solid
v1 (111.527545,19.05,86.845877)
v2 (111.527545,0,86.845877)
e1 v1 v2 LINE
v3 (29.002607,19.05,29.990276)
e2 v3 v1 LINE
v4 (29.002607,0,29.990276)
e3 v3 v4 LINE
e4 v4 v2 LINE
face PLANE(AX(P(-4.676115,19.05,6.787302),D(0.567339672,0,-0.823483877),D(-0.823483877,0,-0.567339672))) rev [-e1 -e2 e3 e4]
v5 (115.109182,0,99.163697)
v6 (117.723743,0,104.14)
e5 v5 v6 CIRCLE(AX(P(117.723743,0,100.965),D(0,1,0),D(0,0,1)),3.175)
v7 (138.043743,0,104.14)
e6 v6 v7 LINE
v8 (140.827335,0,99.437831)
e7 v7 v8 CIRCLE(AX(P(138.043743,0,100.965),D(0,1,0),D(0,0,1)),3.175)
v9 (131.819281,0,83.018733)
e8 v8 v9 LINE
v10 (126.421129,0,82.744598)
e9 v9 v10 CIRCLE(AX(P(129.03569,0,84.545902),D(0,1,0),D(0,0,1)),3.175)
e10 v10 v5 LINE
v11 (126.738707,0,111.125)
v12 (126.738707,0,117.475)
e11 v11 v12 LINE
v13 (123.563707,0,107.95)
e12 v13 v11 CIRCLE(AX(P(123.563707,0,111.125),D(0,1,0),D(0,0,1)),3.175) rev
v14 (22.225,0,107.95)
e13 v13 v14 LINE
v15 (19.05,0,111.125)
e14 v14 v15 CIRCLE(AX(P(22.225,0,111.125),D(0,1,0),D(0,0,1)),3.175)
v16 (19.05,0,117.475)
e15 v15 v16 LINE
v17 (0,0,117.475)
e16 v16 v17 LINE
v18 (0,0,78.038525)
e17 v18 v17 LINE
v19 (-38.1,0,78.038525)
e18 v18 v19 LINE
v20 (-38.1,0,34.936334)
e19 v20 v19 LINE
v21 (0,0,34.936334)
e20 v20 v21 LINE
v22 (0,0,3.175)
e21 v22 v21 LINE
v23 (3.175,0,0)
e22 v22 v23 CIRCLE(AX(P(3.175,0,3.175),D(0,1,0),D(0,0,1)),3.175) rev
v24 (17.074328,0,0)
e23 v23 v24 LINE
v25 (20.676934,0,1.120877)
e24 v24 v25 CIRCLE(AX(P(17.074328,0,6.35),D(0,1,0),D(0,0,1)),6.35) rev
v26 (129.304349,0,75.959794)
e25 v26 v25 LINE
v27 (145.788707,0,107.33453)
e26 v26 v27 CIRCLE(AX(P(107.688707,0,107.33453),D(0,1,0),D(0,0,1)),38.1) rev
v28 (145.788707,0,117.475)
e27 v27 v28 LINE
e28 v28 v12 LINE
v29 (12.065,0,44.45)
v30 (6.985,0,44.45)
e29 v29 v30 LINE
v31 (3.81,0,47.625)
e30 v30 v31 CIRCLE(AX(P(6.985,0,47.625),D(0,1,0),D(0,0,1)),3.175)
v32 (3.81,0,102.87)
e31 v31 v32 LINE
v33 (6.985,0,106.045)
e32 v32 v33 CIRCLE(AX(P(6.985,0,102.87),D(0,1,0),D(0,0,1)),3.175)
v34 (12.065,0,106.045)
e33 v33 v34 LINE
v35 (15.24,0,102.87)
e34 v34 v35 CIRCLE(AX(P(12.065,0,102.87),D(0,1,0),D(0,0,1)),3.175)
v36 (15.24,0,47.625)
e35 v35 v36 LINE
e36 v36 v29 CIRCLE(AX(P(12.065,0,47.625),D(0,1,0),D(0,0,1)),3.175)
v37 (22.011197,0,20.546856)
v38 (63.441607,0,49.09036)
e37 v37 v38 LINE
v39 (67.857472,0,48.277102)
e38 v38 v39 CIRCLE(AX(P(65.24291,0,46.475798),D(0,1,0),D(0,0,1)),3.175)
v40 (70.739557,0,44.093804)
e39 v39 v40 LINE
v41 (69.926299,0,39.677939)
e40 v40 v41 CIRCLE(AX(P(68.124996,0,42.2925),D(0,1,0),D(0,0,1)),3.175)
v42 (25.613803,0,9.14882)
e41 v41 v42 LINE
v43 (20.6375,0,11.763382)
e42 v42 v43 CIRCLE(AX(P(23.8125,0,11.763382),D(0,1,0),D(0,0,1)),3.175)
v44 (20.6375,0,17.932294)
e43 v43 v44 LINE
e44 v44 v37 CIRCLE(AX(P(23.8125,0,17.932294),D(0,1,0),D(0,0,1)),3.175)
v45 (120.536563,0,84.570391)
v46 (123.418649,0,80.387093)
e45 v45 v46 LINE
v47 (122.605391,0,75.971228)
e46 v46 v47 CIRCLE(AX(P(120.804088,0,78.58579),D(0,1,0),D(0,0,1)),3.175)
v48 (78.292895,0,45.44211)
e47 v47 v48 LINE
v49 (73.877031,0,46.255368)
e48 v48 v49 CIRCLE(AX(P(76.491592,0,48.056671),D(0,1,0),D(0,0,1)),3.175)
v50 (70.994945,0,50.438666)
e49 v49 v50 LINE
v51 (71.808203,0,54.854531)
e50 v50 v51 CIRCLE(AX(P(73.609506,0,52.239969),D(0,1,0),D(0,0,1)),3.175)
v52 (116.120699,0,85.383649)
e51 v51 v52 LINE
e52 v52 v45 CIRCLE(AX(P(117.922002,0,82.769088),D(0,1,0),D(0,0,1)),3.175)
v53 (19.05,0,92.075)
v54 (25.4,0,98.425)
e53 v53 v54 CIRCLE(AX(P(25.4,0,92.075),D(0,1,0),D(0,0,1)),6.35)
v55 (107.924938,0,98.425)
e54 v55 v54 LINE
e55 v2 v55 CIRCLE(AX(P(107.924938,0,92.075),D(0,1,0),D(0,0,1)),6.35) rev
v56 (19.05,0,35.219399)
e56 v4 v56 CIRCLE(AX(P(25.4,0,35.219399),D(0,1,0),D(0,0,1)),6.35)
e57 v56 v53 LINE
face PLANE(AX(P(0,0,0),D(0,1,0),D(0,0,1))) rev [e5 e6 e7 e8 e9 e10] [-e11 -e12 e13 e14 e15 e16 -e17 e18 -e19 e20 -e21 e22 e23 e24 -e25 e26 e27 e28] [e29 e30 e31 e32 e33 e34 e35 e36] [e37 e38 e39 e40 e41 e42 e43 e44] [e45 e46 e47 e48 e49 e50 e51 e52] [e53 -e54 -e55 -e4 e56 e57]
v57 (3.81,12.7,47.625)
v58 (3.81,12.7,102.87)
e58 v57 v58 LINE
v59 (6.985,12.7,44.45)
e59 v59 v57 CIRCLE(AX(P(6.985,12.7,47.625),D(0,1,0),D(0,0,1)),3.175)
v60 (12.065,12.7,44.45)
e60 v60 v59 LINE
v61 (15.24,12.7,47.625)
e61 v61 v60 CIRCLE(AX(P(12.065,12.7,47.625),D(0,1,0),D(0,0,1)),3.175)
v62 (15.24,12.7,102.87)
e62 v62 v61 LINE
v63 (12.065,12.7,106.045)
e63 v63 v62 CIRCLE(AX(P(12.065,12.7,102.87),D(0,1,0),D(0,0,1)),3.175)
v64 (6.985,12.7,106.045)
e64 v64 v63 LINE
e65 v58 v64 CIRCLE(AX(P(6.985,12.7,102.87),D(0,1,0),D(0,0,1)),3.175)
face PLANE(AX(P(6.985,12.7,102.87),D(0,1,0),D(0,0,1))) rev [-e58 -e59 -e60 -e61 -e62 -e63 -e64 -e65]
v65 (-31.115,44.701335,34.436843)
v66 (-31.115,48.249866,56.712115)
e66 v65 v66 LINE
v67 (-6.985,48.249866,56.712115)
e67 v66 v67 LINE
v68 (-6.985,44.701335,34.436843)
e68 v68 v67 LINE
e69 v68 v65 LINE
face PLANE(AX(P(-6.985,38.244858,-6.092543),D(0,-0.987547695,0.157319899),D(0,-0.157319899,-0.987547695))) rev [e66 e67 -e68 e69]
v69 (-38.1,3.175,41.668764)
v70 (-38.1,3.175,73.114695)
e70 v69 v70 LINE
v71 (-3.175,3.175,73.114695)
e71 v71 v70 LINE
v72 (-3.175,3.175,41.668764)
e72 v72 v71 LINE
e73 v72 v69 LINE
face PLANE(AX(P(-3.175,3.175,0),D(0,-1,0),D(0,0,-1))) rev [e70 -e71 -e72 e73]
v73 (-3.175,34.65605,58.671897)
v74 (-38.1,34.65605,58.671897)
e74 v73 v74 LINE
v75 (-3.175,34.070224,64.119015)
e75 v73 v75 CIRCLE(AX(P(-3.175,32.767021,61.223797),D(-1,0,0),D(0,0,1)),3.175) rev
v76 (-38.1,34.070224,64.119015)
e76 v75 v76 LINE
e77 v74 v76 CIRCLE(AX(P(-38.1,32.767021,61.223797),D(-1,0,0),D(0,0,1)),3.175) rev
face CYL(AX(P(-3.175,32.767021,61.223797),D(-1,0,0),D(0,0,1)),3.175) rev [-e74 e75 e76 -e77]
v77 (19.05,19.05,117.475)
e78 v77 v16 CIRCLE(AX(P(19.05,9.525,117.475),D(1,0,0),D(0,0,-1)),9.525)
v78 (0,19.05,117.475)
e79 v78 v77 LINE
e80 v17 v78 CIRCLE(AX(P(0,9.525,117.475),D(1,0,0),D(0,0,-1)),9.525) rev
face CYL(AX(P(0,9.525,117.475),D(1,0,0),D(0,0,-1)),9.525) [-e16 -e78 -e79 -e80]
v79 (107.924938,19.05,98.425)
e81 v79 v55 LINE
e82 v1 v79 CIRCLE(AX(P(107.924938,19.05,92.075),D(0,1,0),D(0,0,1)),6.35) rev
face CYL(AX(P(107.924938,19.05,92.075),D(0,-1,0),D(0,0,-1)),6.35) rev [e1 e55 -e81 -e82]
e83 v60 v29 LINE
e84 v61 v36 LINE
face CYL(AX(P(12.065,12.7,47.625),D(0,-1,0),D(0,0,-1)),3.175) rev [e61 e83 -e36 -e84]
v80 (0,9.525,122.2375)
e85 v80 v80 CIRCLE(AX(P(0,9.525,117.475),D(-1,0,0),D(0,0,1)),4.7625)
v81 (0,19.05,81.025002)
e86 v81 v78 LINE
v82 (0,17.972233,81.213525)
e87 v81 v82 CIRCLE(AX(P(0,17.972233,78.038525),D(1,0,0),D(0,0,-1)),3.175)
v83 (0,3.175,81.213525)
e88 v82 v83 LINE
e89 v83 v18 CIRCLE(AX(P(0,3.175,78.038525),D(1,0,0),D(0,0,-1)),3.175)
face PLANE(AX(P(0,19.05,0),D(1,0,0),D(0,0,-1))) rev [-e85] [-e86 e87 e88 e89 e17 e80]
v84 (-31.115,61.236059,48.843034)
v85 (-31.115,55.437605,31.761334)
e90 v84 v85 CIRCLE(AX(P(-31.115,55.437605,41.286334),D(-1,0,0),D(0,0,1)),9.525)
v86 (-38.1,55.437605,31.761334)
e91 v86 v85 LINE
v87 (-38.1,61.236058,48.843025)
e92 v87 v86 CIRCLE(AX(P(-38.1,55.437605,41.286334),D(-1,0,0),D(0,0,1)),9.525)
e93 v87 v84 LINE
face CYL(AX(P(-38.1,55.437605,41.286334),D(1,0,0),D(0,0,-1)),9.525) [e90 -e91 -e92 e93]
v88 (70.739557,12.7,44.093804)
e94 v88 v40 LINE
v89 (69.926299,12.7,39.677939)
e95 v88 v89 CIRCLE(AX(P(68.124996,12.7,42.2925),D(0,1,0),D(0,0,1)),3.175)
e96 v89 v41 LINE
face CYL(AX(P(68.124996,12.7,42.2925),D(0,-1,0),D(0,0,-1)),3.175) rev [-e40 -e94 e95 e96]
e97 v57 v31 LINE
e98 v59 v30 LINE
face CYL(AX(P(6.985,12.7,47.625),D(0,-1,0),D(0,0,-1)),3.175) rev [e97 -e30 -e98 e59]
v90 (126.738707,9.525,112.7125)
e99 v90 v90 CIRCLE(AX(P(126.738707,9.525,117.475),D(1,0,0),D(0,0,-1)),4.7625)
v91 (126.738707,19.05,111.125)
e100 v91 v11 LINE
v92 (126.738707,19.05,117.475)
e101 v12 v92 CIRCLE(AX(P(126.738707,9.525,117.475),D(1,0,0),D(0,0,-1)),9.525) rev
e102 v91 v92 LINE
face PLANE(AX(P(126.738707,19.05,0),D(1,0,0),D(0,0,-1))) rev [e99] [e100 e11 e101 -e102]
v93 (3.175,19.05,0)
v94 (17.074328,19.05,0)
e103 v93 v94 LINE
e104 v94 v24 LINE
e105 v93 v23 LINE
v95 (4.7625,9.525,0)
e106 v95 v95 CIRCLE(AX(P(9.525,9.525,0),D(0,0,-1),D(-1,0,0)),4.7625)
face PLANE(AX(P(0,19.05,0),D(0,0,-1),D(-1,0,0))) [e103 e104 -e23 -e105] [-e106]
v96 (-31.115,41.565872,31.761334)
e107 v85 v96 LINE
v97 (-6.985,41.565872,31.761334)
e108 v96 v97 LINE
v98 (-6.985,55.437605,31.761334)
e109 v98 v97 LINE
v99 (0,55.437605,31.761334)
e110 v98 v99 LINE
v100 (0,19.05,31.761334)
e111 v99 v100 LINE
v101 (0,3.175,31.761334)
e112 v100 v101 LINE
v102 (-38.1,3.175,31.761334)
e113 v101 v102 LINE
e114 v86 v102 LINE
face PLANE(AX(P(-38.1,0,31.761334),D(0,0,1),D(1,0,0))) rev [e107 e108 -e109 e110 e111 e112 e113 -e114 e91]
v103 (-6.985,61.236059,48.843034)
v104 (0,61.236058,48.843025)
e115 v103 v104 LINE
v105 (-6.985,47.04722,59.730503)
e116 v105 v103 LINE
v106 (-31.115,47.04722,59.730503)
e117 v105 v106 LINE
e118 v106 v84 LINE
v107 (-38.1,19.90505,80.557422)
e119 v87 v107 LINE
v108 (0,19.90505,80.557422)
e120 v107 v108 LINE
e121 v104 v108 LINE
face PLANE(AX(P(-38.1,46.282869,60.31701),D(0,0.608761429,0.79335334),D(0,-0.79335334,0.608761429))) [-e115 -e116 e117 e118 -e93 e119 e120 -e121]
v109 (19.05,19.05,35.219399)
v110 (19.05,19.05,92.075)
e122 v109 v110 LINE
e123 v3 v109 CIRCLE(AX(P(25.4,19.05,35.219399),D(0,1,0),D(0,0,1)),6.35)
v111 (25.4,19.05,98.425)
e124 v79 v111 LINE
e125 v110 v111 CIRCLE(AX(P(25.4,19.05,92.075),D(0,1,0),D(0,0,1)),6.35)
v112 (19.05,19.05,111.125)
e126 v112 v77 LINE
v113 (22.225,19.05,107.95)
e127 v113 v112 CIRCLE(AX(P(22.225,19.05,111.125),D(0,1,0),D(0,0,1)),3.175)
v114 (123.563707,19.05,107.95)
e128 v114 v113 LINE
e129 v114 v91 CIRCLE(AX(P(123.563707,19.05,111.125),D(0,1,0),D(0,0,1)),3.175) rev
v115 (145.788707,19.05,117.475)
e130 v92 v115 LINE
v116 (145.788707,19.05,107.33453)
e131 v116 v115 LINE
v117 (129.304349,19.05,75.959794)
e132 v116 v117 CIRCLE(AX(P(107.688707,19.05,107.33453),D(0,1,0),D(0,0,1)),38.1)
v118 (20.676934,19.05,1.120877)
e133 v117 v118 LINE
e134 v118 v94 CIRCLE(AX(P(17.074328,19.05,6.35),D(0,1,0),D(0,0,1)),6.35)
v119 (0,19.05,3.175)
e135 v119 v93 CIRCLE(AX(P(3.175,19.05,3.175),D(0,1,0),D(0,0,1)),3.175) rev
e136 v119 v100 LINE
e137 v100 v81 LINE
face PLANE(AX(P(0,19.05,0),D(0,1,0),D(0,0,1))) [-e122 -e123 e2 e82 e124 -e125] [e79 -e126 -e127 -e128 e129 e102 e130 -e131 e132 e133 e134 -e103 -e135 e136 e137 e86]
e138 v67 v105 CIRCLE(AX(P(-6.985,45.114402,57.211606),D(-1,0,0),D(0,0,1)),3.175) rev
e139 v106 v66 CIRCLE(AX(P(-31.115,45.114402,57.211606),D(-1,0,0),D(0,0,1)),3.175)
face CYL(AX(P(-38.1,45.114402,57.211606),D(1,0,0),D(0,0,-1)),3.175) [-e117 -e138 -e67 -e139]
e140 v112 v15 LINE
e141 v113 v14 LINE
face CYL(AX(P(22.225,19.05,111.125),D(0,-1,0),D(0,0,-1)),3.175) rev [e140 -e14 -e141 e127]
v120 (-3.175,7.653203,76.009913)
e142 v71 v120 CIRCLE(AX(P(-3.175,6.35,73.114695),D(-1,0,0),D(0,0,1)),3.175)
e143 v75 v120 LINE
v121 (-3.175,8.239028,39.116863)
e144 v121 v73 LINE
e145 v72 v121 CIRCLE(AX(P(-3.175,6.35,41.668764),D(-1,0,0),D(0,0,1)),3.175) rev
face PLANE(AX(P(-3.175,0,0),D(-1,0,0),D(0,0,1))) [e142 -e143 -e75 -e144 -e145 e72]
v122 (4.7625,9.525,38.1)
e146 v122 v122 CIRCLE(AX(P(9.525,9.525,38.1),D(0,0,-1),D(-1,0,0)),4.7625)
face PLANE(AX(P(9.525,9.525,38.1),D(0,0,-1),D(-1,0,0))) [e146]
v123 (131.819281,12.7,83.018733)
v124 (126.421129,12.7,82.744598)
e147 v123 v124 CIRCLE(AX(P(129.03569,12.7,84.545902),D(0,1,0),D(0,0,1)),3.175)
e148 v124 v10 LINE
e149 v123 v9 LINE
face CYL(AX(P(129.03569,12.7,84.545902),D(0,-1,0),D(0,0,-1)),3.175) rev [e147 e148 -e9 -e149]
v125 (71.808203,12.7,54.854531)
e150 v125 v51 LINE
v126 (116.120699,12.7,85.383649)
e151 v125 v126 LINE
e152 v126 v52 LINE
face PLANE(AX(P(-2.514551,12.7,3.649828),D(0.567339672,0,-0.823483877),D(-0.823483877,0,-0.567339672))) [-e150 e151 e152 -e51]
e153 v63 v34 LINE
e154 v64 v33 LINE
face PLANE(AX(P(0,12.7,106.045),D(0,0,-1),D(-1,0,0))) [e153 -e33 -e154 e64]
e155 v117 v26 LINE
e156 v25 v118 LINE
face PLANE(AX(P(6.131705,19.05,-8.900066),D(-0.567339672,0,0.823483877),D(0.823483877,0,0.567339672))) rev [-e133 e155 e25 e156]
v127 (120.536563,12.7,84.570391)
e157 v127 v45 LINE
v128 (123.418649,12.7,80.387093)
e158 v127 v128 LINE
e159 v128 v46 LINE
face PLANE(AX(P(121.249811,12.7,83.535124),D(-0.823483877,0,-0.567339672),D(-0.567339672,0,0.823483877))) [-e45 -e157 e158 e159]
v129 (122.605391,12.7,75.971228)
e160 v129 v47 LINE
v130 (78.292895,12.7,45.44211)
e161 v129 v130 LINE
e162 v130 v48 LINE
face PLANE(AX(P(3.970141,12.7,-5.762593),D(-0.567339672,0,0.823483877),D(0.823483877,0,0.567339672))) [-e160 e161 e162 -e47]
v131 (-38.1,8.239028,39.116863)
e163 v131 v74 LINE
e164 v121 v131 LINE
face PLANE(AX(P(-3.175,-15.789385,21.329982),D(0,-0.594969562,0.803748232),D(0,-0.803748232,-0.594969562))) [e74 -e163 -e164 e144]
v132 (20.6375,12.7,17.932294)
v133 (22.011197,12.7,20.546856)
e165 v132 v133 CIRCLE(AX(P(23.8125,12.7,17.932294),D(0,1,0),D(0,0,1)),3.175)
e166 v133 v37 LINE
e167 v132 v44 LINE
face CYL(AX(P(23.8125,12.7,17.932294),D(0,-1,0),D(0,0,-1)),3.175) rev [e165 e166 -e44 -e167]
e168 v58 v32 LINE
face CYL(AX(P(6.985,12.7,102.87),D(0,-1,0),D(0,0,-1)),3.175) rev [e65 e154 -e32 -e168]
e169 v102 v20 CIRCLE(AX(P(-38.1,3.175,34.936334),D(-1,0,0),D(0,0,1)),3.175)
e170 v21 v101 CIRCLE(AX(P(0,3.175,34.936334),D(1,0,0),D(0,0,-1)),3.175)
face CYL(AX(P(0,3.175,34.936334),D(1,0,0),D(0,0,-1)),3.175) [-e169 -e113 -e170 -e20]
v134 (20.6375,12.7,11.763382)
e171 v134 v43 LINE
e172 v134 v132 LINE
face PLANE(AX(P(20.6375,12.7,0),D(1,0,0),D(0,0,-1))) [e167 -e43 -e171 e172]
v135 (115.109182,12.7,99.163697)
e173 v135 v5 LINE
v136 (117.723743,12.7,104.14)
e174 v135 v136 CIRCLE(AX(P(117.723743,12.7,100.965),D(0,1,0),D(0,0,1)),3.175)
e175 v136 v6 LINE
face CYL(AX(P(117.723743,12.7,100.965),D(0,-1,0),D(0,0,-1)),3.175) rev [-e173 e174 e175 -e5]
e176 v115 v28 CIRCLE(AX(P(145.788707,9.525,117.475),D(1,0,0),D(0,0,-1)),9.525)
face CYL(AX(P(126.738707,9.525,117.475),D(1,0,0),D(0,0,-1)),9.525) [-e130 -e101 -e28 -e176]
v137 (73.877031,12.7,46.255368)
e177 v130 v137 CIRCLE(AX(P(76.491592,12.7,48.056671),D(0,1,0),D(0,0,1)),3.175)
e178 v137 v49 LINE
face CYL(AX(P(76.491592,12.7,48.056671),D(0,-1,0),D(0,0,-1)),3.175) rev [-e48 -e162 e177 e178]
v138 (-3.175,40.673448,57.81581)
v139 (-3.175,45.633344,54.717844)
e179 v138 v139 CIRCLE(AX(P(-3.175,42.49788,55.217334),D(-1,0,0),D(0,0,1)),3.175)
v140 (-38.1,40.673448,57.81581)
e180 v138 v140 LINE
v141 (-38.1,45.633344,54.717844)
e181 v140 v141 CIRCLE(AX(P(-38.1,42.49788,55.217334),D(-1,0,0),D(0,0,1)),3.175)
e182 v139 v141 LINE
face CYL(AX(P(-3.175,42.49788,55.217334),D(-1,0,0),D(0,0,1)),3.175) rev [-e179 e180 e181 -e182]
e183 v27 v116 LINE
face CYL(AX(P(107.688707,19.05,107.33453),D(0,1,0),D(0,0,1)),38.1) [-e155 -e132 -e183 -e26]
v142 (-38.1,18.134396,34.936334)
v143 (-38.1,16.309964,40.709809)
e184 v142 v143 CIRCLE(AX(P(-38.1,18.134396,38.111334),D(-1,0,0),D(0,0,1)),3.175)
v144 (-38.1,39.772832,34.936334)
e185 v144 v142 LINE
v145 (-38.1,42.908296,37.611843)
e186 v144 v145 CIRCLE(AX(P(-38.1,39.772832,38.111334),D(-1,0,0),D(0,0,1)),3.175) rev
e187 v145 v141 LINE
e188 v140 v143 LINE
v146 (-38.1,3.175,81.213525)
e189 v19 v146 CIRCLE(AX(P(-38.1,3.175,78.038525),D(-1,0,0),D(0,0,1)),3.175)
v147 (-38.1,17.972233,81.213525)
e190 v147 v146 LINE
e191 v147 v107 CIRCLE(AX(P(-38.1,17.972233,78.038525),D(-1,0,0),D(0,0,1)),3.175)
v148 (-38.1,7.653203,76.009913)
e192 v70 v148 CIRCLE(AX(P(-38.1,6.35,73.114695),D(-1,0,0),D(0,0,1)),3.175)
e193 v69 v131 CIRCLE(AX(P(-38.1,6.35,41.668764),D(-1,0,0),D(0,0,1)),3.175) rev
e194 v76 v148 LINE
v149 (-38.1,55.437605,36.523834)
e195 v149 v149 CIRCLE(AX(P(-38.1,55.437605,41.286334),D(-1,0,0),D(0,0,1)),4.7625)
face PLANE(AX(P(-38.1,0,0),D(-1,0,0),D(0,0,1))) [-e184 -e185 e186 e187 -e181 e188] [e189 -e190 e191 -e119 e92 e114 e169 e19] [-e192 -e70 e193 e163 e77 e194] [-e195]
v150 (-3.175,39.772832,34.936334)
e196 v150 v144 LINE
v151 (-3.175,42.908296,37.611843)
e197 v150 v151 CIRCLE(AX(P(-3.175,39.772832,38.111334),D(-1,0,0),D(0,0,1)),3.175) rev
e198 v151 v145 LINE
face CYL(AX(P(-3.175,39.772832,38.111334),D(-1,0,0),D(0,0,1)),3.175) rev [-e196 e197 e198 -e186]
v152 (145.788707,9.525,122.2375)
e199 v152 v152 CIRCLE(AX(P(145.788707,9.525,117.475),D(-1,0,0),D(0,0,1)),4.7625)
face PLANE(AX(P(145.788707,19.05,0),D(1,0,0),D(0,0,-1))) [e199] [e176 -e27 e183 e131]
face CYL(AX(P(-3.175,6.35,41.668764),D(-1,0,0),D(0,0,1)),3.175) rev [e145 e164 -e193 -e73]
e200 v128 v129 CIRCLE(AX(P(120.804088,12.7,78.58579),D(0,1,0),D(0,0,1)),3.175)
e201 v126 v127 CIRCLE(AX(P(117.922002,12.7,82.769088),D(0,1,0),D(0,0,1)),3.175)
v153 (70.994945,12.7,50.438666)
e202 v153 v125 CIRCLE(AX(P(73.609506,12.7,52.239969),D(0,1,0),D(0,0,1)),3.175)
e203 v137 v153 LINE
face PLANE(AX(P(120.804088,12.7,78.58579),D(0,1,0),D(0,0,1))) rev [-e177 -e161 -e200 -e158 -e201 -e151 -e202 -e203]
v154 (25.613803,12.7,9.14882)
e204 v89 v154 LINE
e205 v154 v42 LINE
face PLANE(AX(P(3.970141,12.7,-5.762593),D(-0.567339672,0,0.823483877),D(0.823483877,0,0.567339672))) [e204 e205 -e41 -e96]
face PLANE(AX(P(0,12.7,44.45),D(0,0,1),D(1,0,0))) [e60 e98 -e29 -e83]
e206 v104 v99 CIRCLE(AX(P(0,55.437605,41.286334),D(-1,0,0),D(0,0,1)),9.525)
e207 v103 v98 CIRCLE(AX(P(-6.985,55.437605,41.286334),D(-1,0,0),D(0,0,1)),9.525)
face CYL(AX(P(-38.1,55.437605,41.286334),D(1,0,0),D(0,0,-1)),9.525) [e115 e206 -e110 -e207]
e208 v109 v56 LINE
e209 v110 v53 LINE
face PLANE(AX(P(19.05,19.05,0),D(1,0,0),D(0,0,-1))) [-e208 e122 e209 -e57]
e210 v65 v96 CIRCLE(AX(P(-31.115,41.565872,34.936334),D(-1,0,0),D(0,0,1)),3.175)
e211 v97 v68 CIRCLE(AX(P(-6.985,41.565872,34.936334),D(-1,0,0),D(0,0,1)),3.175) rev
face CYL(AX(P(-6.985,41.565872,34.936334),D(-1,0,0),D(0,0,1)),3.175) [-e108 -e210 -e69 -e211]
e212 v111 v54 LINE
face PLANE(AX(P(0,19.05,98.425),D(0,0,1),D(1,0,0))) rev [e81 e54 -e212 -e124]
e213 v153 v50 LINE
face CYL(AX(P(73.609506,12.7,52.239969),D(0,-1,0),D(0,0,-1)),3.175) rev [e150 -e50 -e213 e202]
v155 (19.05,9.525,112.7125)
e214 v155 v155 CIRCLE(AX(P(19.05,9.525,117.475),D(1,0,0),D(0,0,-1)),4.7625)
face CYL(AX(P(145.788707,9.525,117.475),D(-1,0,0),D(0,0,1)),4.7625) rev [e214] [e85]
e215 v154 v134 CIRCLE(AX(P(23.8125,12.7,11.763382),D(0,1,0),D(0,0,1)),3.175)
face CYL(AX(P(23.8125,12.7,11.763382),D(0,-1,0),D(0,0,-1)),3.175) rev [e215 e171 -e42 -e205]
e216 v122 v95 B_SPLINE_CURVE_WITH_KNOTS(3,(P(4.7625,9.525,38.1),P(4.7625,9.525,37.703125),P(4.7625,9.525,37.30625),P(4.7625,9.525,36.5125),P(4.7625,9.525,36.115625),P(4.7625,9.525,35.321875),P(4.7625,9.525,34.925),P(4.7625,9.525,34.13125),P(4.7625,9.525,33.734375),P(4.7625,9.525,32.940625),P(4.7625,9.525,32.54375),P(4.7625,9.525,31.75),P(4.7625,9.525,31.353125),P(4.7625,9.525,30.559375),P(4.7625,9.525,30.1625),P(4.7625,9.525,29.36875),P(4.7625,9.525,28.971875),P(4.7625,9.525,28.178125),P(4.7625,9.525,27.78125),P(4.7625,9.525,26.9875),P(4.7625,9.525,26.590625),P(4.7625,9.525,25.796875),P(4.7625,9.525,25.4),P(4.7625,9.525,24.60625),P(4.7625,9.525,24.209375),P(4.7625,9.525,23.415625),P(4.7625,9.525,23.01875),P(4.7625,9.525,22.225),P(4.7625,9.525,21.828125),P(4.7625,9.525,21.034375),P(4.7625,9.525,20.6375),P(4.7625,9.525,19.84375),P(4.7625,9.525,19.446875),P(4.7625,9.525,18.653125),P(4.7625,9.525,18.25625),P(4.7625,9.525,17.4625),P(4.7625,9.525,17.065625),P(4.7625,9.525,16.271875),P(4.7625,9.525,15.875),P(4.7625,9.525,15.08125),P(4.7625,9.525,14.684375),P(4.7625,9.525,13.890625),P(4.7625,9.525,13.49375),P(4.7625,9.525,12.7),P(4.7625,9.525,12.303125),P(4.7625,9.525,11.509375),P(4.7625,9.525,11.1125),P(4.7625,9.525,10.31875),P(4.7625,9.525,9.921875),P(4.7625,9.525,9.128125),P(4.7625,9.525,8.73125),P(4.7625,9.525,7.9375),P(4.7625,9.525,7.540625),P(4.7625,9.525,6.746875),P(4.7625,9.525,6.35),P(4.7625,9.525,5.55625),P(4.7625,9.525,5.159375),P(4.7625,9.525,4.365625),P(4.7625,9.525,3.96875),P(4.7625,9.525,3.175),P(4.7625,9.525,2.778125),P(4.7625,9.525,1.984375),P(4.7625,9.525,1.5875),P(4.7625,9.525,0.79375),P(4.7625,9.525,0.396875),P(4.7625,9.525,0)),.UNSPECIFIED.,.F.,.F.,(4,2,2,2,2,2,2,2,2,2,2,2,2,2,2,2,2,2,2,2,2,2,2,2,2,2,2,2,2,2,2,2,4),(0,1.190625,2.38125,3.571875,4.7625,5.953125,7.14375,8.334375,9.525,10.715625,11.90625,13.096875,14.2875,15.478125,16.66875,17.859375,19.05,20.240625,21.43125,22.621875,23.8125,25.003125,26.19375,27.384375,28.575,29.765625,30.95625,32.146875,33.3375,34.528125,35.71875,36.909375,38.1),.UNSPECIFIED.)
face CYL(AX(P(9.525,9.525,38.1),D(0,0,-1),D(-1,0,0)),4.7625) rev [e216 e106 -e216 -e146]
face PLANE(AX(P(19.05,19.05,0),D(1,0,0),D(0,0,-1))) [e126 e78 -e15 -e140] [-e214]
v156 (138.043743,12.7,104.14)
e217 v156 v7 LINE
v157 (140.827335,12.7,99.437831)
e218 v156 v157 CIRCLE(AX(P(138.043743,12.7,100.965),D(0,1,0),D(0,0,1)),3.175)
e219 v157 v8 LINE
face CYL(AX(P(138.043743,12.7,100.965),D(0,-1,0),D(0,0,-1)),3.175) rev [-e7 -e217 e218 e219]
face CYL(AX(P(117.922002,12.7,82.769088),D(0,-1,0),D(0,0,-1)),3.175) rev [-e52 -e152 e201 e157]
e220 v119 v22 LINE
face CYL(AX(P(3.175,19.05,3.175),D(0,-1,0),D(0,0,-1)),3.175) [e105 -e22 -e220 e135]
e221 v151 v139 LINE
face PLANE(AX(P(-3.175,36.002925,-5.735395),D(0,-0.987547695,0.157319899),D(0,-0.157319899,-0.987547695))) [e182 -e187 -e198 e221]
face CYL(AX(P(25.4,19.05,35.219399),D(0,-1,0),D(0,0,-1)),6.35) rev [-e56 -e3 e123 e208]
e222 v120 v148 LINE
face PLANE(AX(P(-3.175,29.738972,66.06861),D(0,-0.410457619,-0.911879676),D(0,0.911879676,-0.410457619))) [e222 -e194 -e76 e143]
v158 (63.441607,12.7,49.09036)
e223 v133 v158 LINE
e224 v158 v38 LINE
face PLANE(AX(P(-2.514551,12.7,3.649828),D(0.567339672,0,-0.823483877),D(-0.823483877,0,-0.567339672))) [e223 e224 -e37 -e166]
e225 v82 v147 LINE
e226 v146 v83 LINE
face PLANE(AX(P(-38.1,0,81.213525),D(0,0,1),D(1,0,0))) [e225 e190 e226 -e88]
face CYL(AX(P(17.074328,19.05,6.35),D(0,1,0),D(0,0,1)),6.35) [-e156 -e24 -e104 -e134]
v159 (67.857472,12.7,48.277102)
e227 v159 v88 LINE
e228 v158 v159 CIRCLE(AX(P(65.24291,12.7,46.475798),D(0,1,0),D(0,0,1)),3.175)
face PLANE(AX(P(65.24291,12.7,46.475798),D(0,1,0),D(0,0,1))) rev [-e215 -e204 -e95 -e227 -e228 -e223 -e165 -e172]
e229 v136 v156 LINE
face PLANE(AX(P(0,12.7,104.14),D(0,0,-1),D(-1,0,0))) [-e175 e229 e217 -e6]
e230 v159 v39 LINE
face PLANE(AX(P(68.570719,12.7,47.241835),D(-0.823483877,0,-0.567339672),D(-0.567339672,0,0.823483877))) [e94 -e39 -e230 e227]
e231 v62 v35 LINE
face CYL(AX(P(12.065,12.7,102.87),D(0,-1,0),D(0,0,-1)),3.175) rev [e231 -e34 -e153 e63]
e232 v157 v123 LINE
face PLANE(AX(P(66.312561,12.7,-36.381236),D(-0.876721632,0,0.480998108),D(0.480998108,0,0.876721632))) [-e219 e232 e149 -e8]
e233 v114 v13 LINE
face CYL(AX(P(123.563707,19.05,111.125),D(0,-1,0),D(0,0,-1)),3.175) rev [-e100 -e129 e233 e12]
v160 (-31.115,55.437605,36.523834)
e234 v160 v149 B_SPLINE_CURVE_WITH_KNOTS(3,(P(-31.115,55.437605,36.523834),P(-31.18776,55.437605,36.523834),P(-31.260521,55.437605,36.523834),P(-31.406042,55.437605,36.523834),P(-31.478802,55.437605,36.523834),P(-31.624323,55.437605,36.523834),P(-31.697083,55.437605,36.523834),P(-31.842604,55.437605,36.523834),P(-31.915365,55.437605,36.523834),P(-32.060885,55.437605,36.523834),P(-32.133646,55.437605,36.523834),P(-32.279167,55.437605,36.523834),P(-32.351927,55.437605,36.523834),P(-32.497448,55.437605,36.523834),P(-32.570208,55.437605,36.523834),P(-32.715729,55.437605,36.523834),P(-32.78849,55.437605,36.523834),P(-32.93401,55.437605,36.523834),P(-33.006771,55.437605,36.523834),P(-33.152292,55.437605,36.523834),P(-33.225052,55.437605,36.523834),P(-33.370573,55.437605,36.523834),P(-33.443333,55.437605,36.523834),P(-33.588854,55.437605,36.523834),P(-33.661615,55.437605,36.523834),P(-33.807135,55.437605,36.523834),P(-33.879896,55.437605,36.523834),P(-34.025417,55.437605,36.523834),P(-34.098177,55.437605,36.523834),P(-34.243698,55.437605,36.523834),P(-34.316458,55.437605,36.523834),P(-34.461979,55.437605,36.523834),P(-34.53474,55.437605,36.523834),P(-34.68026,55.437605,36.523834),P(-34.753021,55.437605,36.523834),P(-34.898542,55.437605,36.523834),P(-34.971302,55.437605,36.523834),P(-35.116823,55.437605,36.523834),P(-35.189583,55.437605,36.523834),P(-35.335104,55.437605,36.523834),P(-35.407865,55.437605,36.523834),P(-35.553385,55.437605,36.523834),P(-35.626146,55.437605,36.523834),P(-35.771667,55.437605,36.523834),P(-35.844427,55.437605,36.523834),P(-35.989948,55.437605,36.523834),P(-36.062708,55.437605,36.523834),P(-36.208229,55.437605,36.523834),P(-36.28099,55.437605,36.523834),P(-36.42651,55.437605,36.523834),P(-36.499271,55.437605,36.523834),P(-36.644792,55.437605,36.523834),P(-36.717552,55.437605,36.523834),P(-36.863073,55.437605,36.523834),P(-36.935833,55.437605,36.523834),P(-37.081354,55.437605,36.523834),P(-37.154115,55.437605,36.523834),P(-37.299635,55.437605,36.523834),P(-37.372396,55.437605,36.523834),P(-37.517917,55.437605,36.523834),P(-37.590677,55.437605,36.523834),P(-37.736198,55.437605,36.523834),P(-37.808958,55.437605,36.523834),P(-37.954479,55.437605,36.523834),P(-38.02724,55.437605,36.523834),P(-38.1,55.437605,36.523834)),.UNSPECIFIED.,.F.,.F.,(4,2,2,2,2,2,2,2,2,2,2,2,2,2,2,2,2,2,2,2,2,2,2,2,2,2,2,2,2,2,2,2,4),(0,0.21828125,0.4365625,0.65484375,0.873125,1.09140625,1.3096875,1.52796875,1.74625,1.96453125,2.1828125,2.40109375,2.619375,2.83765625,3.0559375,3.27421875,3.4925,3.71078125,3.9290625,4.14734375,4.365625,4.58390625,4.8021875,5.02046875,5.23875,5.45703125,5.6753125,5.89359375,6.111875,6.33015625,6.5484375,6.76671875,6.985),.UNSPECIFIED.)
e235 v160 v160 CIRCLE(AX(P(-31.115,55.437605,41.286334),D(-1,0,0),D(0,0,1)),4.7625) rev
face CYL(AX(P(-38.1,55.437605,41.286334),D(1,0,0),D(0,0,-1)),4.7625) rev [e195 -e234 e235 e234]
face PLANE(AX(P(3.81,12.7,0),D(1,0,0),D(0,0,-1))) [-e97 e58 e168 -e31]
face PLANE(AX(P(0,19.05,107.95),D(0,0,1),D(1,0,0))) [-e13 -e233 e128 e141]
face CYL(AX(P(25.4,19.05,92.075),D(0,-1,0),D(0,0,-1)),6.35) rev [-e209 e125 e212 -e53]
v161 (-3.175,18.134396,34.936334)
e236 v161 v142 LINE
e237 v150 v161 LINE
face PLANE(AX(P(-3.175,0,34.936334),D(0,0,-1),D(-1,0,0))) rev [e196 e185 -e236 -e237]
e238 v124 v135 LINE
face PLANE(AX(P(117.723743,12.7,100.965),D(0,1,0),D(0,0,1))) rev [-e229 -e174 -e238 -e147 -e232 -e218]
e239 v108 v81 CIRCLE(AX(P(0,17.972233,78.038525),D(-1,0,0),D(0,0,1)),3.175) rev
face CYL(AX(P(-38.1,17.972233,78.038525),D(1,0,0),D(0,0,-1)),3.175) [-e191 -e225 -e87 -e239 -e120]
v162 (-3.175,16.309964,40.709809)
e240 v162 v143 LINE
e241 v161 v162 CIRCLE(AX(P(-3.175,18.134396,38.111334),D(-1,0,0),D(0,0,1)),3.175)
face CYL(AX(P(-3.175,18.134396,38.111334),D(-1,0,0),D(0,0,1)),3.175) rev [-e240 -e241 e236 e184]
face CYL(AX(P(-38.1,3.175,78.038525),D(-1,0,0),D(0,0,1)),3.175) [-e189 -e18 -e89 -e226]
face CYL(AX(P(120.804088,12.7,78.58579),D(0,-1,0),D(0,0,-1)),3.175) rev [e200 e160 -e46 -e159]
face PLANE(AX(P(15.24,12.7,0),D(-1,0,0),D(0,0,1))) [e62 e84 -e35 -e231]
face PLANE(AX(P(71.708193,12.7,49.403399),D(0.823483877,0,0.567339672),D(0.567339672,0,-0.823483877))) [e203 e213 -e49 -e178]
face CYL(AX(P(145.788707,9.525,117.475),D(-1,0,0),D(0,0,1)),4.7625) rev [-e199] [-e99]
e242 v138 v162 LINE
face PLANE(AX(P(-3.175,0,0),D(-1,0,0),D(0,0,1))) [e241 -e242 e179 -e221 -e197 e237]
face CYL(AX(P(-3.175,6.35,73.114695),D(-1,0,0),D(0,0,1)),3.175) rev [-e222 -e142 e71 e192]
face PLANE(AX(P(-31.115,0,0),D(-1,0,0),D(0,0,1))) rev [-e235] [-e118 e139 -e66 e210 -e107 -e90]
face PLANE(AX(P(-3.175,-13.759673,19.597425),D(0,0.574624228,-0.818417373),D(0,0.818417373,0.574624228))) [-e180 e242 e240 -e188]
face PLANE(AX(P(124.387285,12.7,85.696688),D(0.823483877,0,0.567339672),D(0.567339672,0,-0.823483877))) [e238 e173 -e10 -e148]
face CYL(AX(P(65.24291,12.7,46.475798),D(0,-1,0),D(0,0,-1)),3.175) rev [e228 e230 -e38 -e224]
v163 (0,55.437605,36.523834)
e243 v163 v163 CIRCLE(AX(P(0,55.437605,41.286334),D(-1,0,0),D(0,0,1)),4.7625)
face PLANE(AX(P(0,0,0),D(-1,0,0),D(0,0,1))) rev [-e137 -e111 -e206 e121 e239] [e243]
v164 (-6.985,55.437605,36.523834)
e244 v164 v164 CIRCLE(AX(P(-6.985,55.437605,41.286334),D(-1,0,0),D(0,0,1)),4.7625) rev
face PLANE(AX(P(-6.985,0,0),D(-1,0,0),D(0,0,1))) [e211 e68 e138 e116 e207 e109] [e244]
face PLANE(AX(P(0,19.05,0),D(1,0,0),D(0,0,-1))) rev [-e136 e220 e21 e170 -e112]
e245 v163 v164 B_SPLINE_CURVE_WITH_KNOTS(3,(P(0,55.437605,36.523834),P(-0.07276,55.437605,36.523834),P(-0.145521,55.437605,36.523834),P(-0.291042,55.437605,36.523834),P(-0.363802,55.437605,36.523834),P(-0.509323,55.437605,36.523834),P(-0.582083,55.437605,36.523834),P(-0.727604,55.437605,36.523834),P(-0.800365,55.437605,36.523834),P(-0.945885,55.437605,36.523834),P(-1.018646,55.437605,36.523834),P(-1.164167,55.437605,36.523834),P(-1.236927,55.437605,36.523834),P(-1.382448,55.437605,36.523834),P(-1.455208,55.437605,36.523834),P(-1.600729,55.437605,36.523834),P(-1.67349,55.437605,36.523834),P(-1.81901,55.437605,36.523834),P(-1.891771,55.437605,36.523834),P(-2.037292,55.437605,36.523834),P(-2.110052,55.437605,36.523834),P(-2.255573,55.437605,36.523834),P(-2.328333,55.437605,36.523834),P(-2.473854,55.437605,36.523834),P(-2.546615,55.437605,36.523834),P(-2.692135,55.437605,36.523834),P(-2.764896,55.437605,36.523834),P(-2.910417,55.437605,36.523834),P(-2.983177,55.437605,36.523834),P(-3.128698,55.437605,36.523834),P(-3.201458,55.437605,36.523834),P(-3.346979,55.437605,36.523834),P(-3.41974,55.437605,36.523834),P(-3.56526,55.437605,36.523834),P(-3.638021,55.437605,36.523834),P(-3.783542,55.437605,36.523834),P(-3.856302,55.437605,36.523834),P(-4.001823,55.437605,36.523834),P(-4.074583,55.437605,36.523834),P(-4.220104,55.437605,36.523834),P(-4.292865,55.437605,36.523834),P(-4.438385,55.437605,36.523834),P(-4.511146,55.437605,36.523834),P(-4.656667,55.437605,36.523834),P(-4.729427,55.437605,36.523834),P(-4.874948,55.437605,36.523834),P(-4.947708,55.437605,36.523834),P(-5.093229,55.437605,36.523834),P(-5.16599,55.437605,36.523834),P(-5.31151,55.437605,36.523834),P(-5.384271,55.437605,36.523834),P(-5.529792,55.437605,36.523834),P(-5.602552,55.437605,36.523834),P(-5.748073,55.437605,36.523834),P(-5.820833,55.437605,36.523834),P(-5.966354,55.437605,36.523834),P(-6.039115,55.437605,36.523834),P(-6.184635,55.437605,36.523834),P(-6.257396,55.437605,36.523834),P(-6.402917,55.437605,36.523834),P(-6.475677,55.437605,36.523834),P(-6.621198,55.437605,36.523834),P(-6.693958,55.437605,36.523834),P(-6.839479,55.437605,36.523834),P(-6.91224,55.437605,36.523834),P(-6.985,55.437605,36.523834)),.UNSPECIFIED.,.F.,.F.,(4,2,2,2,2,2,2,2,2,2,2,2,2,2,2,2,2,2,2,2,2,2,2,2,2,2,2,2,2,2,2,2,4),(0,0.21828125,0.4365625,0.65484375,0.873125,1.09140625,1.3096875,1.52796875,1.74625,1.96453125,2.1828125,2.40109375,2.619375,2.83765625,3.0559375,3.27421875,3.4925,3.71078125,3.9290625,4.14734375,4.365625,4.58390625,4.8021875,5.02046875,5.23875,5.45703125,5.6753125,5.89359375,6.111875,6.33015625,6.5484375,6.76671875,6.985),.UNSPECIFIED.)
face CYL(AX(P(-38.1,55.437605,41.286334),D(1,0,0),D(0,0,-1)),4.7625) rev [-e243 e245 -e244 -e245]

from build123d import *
from build123d.topology import SkipClean

# Parameters (mm, degrees)
BOSS_EXTRUDE1_DEPTH = 19.05
SKETCH7_R           = 4.7625
CUT_EXTRUDE7_DEPTH  = 38.1
FILLET4_R           = 38.1
FILLET5_R           = 6.35
SKETCH8_R           = 4.7625
CUT_EXTRUDE8_DEPTH  = 195.283940649
FILLET6_RADIUS      = 9.525
FILLET6_LENGTH      = 19.05
FILLET7_RADIUS      = 9.525
FILLET7_LENGTH      = 19.05
CUT_EXTRUDE9_START  = -19.05
CUT_EXTRUDE9_DEPTH  = 12.7
CUT_EXTRUDE10_START = -19.05
CUT_EXTRUDE10_DEPTH = 12.7
CUT_EXTRUDE11_START = -19.05
CUT_EXTRUDE11_DEPTH = 12.7
SKETCH12_R          = 4.7625
BOSS_EXTRUDE2_DEPTH = 38.1
CUT_EXTRUDE12_DEPTH = 34.925
CUT_EXTRUDE13_START = -6.985
SKETCH13_4_R        = 4.7625
CUT_EXTRUDE13_DEPTH = 24.13
FILLET13_R          = 3.175
FILLET14_R          = 3.175
FILLET15_R          = 3.175


with BuildPart() as part:
    # Sketch1 → Boss-Extrude1 (new body)
    with BuildSketch(Plane(origin=(0, 0, 0), x_dir=(1, 0, 0), z_dir=(0, 1, 0))):
        with BuildLine():
            ThreePointArc((3.175, 0), (0.92993597, -0.92993597), (0, -3.175))
            Line((0, -3.175), (0, -127))
            Line((0, -127), (19.05, -127))
            Line((19.05, -127), (19.05, -111.125))
            ThreePointArc((19.05, -111.125), (19.97993597, -108.87993597), (22.225, -107.95))
            Line((22.225, -107.95), (123.563707018, -107.95))
            ThreePointArc((123.563707018, -107.95), (125.808771048, -108.87993597), (126.738707018, -111.125))
            Line((126.738707018, -111.125), (126.738707018, -127))
            Line((126.738707018, -127), (145.788707018, -127))
            Line((145.788707018, -127), (145.788707018, -87.316702208))
            Line((145.788707018, -87.316702208), (19.05, 0))
            Line((19.05, 0), (3.175, 0))
        make_face()
        with BuildLine():
            Line((29.002606919, -29.990275978), (111.5275446, -86.845877379))
            ThreePointArc((111.5275446, -86.845877379), (113.98824654, -93.961474404), (107.924937681, -98.425))
            Line((107.924937681, -98.425), (25.4, -98.425))
            ThreePointArc((25.4, -98.425), (20.909871939, -96.565128061), (19.05, -92.075))
            Line((19.05, -92.075), (19.05, -35.2193986))
            ThreePointArc((19.05, -35.2193986), (22.446532033, -29.598052945), (29.002606919, -29.990275978))
        make_face(mode=Mode.SUBTRACT)
    extrude(amount=BOSS_EXTRUDE1_DEPTH)

    # Sketch7 → Cut-Extrude7 (cut)
    with BuildSketch(Plane(origin=(0, 0, 0), x_dir=(-1, 0, 0), z_dir=(0, 0, -1))):
        with Locations((-9.525, 9.525)):
            Circle(SKETCH7_R)
    extrude(amount=-CUT_EXTRUDE7_DEPTH, mode=Mode.SUBTRACT)

    # Fillet4
    fillet4_edges = [part.edges().sort_by_distance(p)[0] for p in [
        (145.788707018, 9.525, 87.316702208),
    ]]
    fillet(fillet4_edges, radius=FILLET4_R)

    # Fillet5
    fillet5_edges = [part.edges().sort_by_distance(p)[0] for p in [
        (19.05, 9.525, 0),
    ]]
    fillet(fillet5_edges, radius=FILLET5_R)

    # Sketch8 → Cut-Extrude8 (cut, through all)
    with BuildSketch(Plane.ZY):
        with Locations((117.475, 9.525)):
            Circle(SKETCH8_R)
    extrude(amount=-CUT_EXTRUDE8_DEPTH, mode=Mode.SUBTRACT)

    # Fillet6: full round fillet: the end face becomes a half cylinder, R = half its width
    fillet6_face = Plane((9.525, 9.525, 127), x_dir=(1, 0, 0), z_dir=(0, 0, 1))  # on the end face: x along it, z out of the body
    fillet6_slab = fillet6_face.offset(-FILLET6_RADIUS / 2) * Box(FILLET6_LENGTH, 2 * FILLET6_RADIUS, FILLET6_RADIUS, mode=Mode.PRIVATE)  # the body's end, R deep
    fillet6_round = Plane((9.525, 9.525, 117.475), x_dir=(0, 0, 1), z_dir=(1, 0, 0)) * Cylinder(FILLET6_RADIUS, FILLET6_LENGTH, mode=Mode.PRIVATE)  # its axis R under the face
    add(fillet6_slab - fillet6_round, mode=Mode.SUBTRACT)

    # Fillet7: full round fillet: the end face becomes a half cylinder, R = half its width
    fillet7_face = Plane((136.263707018, 9.525, 127), x_dir=(-1, 0, 0), z_dir=(0, 0, 1))  # on the end face: x along it, z out of the body
    fillet7_slab = fillet7_face.offset(-FILLET7_RADIUS / 2) * Box(FILLET7_LENGTH, 2 * FILLET7_RADIUS, FILLET7_RADIUS, mode=Mode.PRIVATE)  # the body's end, R deep
    fillet7_round = Plane((136.263707018, 9.525, 117.475), x_dir=(0, 0, 1), z_dir=(-1, 0, 0)) * Cylinder(FILLET7_RADIUS, FILLET7_LENGTH, mode=Mode.PRIVATE)  # its axis R under the face
    add(fillet7_slab - fillet7_round, mode=Mode.SUBTRACT)

    # Sketch9 → Cut-Extrude9 (cut)
    with BuildSketch(Plane(origin=(0, 19.05, 0), x_dir=(1, 0, 0), z_dir=(0, 1, 0)).offset(CUT_EXTRUDE9_START)):
        with BuildLine():
            Line((6.985, -44.45), (12.065, -44.45))
            ThreePointArc((12.065, -44.45), (14.31006403, -45.37993597), (15.24, -47.625))
            Line((15.24, -47.625), (15.24, -92.075))
            Line((15.24, -92.075), (15.24, -102.87))
            ThreePointArc((15.24, -102.87), (14.31006403, -105.11506403), (12.065, -106.045))
            Line((12.065, -106.045), (6.985, -106.045))
            ThreePointArc((6.985, -106.045), (4.73993597, -105.11506403), (3.81, -102.87))
            Line((3.81, -102.87), (3.81, -47.625))
            ThreePointArc((3.81, -47.625), (4.73993597, -45.37993597), (6.985, -44.45))
        make_face()
    extrude(amount=CUT_EXTRUDE9_DEPTH, mode=Mode.SUBTRACT)

    # Sketch10 → Cut-Extrude10 (cut)
    with BuildSketch(Plane(origin=(0, 19.05, 0), x_dir=(1, 0, 0), z_dir=(0, 1, 0)).offset(CUT_EXTRUDE10_START)):
        with BuildLine():
            Line((20.6375, -11.763381719), (20.6375, -17.932294237))
            ThreePointArc((20.6375, -17.932294237), (21.001827173, -19.409028221), (22.011196541, -20.546855548))
            Line((22.011196541, -20.546855548), (63.441606739, -49.090359539))
            ThreePointArc((63.441606739, -49.090359539), (65.81797034, -49.598286152), (67.857471509, -48.277101687))
            Line((67.857471509, -48.277101687), (70.739557043, -44.09380359))
            ThreePointArc((70.739557043, -44.09380359), (71.247483656, -41.717439989), (69.926299192, -39.67793882))
            Line((69.926299192, -39.67793882), (25.613803459, -9.148820408))
            ThreePointArc((25.613803459, -9.148820408), (22.335766016, -8.952708891), (20.6375, -11.763381719))
        make_face()
        with BuildLine():
            Line((123.418648971, -80.387093072), (120.536563436, -84.570391169))
            ThreePointArc((120.536563436, -84.570391169), (118.497062267, -85.891575634), (116.120698666, -85.383649021))
            Line((116.120698666, -85.383649021), (71.808202933, -54.854530608))
            ThreePointArc((71.808202933, -54.854530608), (70.487018469, -52.815029439), (70.994945082, -50.438665838))
            Line((70.994945082, -50.438665838), (73.877030616, -46.255367741))
            ThreePointArc((73.877030616, -46.255367741), (75.916531785, -44.934183277), (78.292895386, -45.44210989))
            Line((78.292895386, -45.44210989), (122.605391119, -75.971228302))
            ThreePointArc((122.605391119, -75.971228302), (123.926575583, -78.010729471), (123.418648971, -80.387093072))
        make_face()
    extrude(amount=CUT_EXTRUDE10_DEPTH, mode=Mode.SUBTRACT)

    # Sketch11 → Cut-Extrude11 (cut)
    with BuildSketch(Plane(origin=(0, 19.05, 0), x_dir=(1, 0, 0), z_dir=(0, 1, 0)).offset(CUT_EXTRUDE11_START)):
        with BuildLine():
            Line((117.723743339, -104.14), (138.043743339, -104.14))
            ThreePointArc((138.043743339, -104.14), (140.775902425, -102.582384223), (140.82733452, -99.437831007))
            Line((140.82733452, -99.437831007), (131.819281268, -83.018732847))
            ThreePointArc((131.819281268, -83.018732847), (129.196718657, -81.374987965), (126.421128775, -82.74459838))
            Line((126.421128775, -82.74459838), (115.109182028, -99.163696541))
            ThreePointArc((115.109182028, -99.163696541), (114.913070511, -102.441733984), (117.723743339, -104.14))
        make_face()
    extrude(amount=CUT_EXTRUDE11_DEPTH, mode=Mode.SUBTRACT)

    # Sketch12 → Boss-Extrude2 (add)
    with BuildSketch(Plane.ZY):
        with BuildLine():
            Line((31.761333992, 55.437605021), (31.761333992, 0))
            Line((31.761333992, 0), (81.213525096, 0))
            Line((81.213525096, 0), (81.213525096, 19.05))
            Line((81.213525096, 19.05), (48.843024558, 61.236057633))
            ThreePointArc((48.843024558, 61.236057633), (38.224623085, 64.457114505), (31.761333992, 55.437605021))
        make_face()
        with Locations(Location((41.286333992, 55.437605021, 0), (0, 0, 180))):
            Circle(SKETCH12_R, mode=Mode.SUBTRACT)
    extrude(amount=BOSS_EXTRUDE2_DEPTH)

    # Sketch13 → Cut-Extrude12 (cut)
    with BuildSketch(Plane.ZY.offset(38.1)):
        with BuildLine():
            Line((34.936333992, 39.772832304), (34.936333992, 18.134396169))
            ThreePointArc((34.936333992, 18.134396169), (37.154655789, 15.106956357), (40.709809152, 16.309964245))
            Line((40.709809152, 16.309964245), (57.81580954, 40.673447753))
            ThreePointArc((57.81580954, 40.673447753), (57.910209366, 44.179857475), (54.717843702, 45.633343608))
            Line((54.717843702, 45.633343608), (37.611843313, 42.908296235))
            ThreePointArc((37.611843313, 42.908296235), (35.696120968, 41.833747404), (34.936333992, 39.772832304))
        make_face()
        with BuildLine():
            Line((41.668763699, 3.175), (73.114694638, 3.175))
            ThreePointArc((73.114694638, 3.175), (75.78099304, 4.626202497), (76.009912608, 7.653202941))
            Line((76.009912608, 7.653202941), (64.11901518, 34.070224292))
            ThreePointArc((64.11901518, 34.070224292), (61.563303547, 35.923817266), (58.671896573, 34.656049709))
            Line((58.671896573, 34.656049709), (39.116863062, 8.239028358))
            ThreePointArc((39.116863062, 8.239028358), (38.833425091, 4.921196311), (41.668763699, 3.175))
        make_face()
    extrude(amount=-CUT_EXTRUDE12_DEPTH, mode=Mode.SUBTRACT)

    # Sketch13<4> → Cut-Extrude13 (cut)
    # profile 1 of 3: a face of its own
    with SkipClean():  # the faces are left unmerged after this step: merging them gives an invalid solid
        with BuildSketch(Plane.ZY.offset(38.1).offset(CUT_EXTRUDE13_START)):
            with BuildLine():
                Line((37.611843313, 42.908296235), (54.717843702, 45.633343608))
                ThreePointArc((54.717843702, 45.633343608), (57.910209366, 44.179857475), (57.81580954, 40.673447753))
                Line((57.81580954, 40.673447753), (40.709809152, 16.309964245))
                ThreePointArc((40.709809152, 16.309964245), (37.154655789, 15.106956357), (34.936333992, 18.134396169))
                Line((34.936333992, 18.134396169), (34.936333992, 39.772832304))
                ThreePointArc((34.936333992, 39.772832304), (35.696120968, 41.833747404), (37.611843313, 42.908296235))
            make_face()
        # profile 2 of 3: a face of its own
        with BuildSketch(Plane.ZY.offset(38.1).offset(CUT_EXTRUDE13_START)):
            with BuildLine():
                Line((31.761333992, 44.275117198), (58.579423638, 48.547335312))
                Line((58.579423638, 48.547335312), (48.843044303, 61.236059961))
                ThreePointArc((48.843044303, 61.236059961), (38.22461551, 64.457129972), (31.761316911, 55.437590446))
                Line((31.761316911, 55.437590446), (31.761333992, 44.275117198))
            make_face()
            with Locations(Location((41.286333992, 55.437605021, 0), (0, 0, 180))):
                Circle(SKETCH13_4_R, mode=Mode.SUBTRACT)
        # profile 3 of 3: a face of its own
        with BuildSketch(Plane.ZY.offset(38.1).offset(CUT_EXTRUDE13_START)):
            with BuildLine():
                Line((39.116863062, 8.239028358), (58.671896573, 34.656049709))
                ThreePointArc((58.671896573, 34.656049709), (61.563303547, 35.923817266), (64.11901518, 34.070224292))
                Line((64.11901518, 34.070224292), (76.009912608, 7.653202941))
                ThreePointArc((76.009912608, 7.653202941), (75.78099304, 4.626202497), (73.114694638, 3.175))
                Line((73.114694638, 3.175), (41.668763699, 3.175))
                ThreePointArc((41.668763699, 3.175), (38.833425091, 4.921196311), (39.116863062, 8.239028358))
            make_face()
        extrude(amount=-CUT_EXTRUDE13_DEPTH, mode=Mode.SUBTRACT)
    add(part.part.scale(1), mode=Mode.REPLACE)  # the faces are merged on a copy

    # Fillet13
    fillet13_edges = [part.edges().sort_by_distance(p)[0] for p in [
        (-19.05, 44.275117198, 31.761333992),
        (-19.05, 48.547335312, 58.579423638),
    ]]
    fillet(fillet13_edges, radius=FILLET13_R)

    # Fillet14
    fillet14_edges = [part.edges().sort_by_distance(p)[0] for p in [
        (-19.05, 0, 31.761333992),
    ]]
    fillet(fillet14_edges, radius=FILLET14_R)

    # Fillet15
    # the kernel refuses this fillet: 3.175 mm, written as the material it takes off along each edge
    with BuildSketch(Plane(origin=(0, 19.05, 81.213525096), x_dir=(0, 0.7933533402912315, -0.6087614290087253), z_dir=(-1, 0, 0))) as fillet15_piece_1:
        with BuildLine():
            CenterArc((FILLET15_R * 0.339454258863, FILLET15_R), FILLET15_R, 232.5, 37.5)
            Line((-FILLET15_R * 0.269307170145, FILLET15_R * 0.206646659709), (0, 0))
            Line((0, 0), (FILLET15_R * 0.339454258863, 0))
        make_face()
    extrude(amount=40.79441818, mode=Mode.SUBTRACT)
    with BuildSketch(Plane(origin=(0, 0, 81.213525096), x_dir=(0, 0, -1), z_dir=(-1, 0, 0))) as fillet15_piece_2:
        with BuildLine():
            CenterArc((FILLET15_R, -FILLET15_R), FILLET15_R, 90, 90)
            Line((0, -FILLET15_R), (0, 0))
            Line((0, 0), (FILLET15_R, 0))
        make_face()
    extrude(amount=46.0375, mode=Mode.SUBTRACT)


solid = part.part
